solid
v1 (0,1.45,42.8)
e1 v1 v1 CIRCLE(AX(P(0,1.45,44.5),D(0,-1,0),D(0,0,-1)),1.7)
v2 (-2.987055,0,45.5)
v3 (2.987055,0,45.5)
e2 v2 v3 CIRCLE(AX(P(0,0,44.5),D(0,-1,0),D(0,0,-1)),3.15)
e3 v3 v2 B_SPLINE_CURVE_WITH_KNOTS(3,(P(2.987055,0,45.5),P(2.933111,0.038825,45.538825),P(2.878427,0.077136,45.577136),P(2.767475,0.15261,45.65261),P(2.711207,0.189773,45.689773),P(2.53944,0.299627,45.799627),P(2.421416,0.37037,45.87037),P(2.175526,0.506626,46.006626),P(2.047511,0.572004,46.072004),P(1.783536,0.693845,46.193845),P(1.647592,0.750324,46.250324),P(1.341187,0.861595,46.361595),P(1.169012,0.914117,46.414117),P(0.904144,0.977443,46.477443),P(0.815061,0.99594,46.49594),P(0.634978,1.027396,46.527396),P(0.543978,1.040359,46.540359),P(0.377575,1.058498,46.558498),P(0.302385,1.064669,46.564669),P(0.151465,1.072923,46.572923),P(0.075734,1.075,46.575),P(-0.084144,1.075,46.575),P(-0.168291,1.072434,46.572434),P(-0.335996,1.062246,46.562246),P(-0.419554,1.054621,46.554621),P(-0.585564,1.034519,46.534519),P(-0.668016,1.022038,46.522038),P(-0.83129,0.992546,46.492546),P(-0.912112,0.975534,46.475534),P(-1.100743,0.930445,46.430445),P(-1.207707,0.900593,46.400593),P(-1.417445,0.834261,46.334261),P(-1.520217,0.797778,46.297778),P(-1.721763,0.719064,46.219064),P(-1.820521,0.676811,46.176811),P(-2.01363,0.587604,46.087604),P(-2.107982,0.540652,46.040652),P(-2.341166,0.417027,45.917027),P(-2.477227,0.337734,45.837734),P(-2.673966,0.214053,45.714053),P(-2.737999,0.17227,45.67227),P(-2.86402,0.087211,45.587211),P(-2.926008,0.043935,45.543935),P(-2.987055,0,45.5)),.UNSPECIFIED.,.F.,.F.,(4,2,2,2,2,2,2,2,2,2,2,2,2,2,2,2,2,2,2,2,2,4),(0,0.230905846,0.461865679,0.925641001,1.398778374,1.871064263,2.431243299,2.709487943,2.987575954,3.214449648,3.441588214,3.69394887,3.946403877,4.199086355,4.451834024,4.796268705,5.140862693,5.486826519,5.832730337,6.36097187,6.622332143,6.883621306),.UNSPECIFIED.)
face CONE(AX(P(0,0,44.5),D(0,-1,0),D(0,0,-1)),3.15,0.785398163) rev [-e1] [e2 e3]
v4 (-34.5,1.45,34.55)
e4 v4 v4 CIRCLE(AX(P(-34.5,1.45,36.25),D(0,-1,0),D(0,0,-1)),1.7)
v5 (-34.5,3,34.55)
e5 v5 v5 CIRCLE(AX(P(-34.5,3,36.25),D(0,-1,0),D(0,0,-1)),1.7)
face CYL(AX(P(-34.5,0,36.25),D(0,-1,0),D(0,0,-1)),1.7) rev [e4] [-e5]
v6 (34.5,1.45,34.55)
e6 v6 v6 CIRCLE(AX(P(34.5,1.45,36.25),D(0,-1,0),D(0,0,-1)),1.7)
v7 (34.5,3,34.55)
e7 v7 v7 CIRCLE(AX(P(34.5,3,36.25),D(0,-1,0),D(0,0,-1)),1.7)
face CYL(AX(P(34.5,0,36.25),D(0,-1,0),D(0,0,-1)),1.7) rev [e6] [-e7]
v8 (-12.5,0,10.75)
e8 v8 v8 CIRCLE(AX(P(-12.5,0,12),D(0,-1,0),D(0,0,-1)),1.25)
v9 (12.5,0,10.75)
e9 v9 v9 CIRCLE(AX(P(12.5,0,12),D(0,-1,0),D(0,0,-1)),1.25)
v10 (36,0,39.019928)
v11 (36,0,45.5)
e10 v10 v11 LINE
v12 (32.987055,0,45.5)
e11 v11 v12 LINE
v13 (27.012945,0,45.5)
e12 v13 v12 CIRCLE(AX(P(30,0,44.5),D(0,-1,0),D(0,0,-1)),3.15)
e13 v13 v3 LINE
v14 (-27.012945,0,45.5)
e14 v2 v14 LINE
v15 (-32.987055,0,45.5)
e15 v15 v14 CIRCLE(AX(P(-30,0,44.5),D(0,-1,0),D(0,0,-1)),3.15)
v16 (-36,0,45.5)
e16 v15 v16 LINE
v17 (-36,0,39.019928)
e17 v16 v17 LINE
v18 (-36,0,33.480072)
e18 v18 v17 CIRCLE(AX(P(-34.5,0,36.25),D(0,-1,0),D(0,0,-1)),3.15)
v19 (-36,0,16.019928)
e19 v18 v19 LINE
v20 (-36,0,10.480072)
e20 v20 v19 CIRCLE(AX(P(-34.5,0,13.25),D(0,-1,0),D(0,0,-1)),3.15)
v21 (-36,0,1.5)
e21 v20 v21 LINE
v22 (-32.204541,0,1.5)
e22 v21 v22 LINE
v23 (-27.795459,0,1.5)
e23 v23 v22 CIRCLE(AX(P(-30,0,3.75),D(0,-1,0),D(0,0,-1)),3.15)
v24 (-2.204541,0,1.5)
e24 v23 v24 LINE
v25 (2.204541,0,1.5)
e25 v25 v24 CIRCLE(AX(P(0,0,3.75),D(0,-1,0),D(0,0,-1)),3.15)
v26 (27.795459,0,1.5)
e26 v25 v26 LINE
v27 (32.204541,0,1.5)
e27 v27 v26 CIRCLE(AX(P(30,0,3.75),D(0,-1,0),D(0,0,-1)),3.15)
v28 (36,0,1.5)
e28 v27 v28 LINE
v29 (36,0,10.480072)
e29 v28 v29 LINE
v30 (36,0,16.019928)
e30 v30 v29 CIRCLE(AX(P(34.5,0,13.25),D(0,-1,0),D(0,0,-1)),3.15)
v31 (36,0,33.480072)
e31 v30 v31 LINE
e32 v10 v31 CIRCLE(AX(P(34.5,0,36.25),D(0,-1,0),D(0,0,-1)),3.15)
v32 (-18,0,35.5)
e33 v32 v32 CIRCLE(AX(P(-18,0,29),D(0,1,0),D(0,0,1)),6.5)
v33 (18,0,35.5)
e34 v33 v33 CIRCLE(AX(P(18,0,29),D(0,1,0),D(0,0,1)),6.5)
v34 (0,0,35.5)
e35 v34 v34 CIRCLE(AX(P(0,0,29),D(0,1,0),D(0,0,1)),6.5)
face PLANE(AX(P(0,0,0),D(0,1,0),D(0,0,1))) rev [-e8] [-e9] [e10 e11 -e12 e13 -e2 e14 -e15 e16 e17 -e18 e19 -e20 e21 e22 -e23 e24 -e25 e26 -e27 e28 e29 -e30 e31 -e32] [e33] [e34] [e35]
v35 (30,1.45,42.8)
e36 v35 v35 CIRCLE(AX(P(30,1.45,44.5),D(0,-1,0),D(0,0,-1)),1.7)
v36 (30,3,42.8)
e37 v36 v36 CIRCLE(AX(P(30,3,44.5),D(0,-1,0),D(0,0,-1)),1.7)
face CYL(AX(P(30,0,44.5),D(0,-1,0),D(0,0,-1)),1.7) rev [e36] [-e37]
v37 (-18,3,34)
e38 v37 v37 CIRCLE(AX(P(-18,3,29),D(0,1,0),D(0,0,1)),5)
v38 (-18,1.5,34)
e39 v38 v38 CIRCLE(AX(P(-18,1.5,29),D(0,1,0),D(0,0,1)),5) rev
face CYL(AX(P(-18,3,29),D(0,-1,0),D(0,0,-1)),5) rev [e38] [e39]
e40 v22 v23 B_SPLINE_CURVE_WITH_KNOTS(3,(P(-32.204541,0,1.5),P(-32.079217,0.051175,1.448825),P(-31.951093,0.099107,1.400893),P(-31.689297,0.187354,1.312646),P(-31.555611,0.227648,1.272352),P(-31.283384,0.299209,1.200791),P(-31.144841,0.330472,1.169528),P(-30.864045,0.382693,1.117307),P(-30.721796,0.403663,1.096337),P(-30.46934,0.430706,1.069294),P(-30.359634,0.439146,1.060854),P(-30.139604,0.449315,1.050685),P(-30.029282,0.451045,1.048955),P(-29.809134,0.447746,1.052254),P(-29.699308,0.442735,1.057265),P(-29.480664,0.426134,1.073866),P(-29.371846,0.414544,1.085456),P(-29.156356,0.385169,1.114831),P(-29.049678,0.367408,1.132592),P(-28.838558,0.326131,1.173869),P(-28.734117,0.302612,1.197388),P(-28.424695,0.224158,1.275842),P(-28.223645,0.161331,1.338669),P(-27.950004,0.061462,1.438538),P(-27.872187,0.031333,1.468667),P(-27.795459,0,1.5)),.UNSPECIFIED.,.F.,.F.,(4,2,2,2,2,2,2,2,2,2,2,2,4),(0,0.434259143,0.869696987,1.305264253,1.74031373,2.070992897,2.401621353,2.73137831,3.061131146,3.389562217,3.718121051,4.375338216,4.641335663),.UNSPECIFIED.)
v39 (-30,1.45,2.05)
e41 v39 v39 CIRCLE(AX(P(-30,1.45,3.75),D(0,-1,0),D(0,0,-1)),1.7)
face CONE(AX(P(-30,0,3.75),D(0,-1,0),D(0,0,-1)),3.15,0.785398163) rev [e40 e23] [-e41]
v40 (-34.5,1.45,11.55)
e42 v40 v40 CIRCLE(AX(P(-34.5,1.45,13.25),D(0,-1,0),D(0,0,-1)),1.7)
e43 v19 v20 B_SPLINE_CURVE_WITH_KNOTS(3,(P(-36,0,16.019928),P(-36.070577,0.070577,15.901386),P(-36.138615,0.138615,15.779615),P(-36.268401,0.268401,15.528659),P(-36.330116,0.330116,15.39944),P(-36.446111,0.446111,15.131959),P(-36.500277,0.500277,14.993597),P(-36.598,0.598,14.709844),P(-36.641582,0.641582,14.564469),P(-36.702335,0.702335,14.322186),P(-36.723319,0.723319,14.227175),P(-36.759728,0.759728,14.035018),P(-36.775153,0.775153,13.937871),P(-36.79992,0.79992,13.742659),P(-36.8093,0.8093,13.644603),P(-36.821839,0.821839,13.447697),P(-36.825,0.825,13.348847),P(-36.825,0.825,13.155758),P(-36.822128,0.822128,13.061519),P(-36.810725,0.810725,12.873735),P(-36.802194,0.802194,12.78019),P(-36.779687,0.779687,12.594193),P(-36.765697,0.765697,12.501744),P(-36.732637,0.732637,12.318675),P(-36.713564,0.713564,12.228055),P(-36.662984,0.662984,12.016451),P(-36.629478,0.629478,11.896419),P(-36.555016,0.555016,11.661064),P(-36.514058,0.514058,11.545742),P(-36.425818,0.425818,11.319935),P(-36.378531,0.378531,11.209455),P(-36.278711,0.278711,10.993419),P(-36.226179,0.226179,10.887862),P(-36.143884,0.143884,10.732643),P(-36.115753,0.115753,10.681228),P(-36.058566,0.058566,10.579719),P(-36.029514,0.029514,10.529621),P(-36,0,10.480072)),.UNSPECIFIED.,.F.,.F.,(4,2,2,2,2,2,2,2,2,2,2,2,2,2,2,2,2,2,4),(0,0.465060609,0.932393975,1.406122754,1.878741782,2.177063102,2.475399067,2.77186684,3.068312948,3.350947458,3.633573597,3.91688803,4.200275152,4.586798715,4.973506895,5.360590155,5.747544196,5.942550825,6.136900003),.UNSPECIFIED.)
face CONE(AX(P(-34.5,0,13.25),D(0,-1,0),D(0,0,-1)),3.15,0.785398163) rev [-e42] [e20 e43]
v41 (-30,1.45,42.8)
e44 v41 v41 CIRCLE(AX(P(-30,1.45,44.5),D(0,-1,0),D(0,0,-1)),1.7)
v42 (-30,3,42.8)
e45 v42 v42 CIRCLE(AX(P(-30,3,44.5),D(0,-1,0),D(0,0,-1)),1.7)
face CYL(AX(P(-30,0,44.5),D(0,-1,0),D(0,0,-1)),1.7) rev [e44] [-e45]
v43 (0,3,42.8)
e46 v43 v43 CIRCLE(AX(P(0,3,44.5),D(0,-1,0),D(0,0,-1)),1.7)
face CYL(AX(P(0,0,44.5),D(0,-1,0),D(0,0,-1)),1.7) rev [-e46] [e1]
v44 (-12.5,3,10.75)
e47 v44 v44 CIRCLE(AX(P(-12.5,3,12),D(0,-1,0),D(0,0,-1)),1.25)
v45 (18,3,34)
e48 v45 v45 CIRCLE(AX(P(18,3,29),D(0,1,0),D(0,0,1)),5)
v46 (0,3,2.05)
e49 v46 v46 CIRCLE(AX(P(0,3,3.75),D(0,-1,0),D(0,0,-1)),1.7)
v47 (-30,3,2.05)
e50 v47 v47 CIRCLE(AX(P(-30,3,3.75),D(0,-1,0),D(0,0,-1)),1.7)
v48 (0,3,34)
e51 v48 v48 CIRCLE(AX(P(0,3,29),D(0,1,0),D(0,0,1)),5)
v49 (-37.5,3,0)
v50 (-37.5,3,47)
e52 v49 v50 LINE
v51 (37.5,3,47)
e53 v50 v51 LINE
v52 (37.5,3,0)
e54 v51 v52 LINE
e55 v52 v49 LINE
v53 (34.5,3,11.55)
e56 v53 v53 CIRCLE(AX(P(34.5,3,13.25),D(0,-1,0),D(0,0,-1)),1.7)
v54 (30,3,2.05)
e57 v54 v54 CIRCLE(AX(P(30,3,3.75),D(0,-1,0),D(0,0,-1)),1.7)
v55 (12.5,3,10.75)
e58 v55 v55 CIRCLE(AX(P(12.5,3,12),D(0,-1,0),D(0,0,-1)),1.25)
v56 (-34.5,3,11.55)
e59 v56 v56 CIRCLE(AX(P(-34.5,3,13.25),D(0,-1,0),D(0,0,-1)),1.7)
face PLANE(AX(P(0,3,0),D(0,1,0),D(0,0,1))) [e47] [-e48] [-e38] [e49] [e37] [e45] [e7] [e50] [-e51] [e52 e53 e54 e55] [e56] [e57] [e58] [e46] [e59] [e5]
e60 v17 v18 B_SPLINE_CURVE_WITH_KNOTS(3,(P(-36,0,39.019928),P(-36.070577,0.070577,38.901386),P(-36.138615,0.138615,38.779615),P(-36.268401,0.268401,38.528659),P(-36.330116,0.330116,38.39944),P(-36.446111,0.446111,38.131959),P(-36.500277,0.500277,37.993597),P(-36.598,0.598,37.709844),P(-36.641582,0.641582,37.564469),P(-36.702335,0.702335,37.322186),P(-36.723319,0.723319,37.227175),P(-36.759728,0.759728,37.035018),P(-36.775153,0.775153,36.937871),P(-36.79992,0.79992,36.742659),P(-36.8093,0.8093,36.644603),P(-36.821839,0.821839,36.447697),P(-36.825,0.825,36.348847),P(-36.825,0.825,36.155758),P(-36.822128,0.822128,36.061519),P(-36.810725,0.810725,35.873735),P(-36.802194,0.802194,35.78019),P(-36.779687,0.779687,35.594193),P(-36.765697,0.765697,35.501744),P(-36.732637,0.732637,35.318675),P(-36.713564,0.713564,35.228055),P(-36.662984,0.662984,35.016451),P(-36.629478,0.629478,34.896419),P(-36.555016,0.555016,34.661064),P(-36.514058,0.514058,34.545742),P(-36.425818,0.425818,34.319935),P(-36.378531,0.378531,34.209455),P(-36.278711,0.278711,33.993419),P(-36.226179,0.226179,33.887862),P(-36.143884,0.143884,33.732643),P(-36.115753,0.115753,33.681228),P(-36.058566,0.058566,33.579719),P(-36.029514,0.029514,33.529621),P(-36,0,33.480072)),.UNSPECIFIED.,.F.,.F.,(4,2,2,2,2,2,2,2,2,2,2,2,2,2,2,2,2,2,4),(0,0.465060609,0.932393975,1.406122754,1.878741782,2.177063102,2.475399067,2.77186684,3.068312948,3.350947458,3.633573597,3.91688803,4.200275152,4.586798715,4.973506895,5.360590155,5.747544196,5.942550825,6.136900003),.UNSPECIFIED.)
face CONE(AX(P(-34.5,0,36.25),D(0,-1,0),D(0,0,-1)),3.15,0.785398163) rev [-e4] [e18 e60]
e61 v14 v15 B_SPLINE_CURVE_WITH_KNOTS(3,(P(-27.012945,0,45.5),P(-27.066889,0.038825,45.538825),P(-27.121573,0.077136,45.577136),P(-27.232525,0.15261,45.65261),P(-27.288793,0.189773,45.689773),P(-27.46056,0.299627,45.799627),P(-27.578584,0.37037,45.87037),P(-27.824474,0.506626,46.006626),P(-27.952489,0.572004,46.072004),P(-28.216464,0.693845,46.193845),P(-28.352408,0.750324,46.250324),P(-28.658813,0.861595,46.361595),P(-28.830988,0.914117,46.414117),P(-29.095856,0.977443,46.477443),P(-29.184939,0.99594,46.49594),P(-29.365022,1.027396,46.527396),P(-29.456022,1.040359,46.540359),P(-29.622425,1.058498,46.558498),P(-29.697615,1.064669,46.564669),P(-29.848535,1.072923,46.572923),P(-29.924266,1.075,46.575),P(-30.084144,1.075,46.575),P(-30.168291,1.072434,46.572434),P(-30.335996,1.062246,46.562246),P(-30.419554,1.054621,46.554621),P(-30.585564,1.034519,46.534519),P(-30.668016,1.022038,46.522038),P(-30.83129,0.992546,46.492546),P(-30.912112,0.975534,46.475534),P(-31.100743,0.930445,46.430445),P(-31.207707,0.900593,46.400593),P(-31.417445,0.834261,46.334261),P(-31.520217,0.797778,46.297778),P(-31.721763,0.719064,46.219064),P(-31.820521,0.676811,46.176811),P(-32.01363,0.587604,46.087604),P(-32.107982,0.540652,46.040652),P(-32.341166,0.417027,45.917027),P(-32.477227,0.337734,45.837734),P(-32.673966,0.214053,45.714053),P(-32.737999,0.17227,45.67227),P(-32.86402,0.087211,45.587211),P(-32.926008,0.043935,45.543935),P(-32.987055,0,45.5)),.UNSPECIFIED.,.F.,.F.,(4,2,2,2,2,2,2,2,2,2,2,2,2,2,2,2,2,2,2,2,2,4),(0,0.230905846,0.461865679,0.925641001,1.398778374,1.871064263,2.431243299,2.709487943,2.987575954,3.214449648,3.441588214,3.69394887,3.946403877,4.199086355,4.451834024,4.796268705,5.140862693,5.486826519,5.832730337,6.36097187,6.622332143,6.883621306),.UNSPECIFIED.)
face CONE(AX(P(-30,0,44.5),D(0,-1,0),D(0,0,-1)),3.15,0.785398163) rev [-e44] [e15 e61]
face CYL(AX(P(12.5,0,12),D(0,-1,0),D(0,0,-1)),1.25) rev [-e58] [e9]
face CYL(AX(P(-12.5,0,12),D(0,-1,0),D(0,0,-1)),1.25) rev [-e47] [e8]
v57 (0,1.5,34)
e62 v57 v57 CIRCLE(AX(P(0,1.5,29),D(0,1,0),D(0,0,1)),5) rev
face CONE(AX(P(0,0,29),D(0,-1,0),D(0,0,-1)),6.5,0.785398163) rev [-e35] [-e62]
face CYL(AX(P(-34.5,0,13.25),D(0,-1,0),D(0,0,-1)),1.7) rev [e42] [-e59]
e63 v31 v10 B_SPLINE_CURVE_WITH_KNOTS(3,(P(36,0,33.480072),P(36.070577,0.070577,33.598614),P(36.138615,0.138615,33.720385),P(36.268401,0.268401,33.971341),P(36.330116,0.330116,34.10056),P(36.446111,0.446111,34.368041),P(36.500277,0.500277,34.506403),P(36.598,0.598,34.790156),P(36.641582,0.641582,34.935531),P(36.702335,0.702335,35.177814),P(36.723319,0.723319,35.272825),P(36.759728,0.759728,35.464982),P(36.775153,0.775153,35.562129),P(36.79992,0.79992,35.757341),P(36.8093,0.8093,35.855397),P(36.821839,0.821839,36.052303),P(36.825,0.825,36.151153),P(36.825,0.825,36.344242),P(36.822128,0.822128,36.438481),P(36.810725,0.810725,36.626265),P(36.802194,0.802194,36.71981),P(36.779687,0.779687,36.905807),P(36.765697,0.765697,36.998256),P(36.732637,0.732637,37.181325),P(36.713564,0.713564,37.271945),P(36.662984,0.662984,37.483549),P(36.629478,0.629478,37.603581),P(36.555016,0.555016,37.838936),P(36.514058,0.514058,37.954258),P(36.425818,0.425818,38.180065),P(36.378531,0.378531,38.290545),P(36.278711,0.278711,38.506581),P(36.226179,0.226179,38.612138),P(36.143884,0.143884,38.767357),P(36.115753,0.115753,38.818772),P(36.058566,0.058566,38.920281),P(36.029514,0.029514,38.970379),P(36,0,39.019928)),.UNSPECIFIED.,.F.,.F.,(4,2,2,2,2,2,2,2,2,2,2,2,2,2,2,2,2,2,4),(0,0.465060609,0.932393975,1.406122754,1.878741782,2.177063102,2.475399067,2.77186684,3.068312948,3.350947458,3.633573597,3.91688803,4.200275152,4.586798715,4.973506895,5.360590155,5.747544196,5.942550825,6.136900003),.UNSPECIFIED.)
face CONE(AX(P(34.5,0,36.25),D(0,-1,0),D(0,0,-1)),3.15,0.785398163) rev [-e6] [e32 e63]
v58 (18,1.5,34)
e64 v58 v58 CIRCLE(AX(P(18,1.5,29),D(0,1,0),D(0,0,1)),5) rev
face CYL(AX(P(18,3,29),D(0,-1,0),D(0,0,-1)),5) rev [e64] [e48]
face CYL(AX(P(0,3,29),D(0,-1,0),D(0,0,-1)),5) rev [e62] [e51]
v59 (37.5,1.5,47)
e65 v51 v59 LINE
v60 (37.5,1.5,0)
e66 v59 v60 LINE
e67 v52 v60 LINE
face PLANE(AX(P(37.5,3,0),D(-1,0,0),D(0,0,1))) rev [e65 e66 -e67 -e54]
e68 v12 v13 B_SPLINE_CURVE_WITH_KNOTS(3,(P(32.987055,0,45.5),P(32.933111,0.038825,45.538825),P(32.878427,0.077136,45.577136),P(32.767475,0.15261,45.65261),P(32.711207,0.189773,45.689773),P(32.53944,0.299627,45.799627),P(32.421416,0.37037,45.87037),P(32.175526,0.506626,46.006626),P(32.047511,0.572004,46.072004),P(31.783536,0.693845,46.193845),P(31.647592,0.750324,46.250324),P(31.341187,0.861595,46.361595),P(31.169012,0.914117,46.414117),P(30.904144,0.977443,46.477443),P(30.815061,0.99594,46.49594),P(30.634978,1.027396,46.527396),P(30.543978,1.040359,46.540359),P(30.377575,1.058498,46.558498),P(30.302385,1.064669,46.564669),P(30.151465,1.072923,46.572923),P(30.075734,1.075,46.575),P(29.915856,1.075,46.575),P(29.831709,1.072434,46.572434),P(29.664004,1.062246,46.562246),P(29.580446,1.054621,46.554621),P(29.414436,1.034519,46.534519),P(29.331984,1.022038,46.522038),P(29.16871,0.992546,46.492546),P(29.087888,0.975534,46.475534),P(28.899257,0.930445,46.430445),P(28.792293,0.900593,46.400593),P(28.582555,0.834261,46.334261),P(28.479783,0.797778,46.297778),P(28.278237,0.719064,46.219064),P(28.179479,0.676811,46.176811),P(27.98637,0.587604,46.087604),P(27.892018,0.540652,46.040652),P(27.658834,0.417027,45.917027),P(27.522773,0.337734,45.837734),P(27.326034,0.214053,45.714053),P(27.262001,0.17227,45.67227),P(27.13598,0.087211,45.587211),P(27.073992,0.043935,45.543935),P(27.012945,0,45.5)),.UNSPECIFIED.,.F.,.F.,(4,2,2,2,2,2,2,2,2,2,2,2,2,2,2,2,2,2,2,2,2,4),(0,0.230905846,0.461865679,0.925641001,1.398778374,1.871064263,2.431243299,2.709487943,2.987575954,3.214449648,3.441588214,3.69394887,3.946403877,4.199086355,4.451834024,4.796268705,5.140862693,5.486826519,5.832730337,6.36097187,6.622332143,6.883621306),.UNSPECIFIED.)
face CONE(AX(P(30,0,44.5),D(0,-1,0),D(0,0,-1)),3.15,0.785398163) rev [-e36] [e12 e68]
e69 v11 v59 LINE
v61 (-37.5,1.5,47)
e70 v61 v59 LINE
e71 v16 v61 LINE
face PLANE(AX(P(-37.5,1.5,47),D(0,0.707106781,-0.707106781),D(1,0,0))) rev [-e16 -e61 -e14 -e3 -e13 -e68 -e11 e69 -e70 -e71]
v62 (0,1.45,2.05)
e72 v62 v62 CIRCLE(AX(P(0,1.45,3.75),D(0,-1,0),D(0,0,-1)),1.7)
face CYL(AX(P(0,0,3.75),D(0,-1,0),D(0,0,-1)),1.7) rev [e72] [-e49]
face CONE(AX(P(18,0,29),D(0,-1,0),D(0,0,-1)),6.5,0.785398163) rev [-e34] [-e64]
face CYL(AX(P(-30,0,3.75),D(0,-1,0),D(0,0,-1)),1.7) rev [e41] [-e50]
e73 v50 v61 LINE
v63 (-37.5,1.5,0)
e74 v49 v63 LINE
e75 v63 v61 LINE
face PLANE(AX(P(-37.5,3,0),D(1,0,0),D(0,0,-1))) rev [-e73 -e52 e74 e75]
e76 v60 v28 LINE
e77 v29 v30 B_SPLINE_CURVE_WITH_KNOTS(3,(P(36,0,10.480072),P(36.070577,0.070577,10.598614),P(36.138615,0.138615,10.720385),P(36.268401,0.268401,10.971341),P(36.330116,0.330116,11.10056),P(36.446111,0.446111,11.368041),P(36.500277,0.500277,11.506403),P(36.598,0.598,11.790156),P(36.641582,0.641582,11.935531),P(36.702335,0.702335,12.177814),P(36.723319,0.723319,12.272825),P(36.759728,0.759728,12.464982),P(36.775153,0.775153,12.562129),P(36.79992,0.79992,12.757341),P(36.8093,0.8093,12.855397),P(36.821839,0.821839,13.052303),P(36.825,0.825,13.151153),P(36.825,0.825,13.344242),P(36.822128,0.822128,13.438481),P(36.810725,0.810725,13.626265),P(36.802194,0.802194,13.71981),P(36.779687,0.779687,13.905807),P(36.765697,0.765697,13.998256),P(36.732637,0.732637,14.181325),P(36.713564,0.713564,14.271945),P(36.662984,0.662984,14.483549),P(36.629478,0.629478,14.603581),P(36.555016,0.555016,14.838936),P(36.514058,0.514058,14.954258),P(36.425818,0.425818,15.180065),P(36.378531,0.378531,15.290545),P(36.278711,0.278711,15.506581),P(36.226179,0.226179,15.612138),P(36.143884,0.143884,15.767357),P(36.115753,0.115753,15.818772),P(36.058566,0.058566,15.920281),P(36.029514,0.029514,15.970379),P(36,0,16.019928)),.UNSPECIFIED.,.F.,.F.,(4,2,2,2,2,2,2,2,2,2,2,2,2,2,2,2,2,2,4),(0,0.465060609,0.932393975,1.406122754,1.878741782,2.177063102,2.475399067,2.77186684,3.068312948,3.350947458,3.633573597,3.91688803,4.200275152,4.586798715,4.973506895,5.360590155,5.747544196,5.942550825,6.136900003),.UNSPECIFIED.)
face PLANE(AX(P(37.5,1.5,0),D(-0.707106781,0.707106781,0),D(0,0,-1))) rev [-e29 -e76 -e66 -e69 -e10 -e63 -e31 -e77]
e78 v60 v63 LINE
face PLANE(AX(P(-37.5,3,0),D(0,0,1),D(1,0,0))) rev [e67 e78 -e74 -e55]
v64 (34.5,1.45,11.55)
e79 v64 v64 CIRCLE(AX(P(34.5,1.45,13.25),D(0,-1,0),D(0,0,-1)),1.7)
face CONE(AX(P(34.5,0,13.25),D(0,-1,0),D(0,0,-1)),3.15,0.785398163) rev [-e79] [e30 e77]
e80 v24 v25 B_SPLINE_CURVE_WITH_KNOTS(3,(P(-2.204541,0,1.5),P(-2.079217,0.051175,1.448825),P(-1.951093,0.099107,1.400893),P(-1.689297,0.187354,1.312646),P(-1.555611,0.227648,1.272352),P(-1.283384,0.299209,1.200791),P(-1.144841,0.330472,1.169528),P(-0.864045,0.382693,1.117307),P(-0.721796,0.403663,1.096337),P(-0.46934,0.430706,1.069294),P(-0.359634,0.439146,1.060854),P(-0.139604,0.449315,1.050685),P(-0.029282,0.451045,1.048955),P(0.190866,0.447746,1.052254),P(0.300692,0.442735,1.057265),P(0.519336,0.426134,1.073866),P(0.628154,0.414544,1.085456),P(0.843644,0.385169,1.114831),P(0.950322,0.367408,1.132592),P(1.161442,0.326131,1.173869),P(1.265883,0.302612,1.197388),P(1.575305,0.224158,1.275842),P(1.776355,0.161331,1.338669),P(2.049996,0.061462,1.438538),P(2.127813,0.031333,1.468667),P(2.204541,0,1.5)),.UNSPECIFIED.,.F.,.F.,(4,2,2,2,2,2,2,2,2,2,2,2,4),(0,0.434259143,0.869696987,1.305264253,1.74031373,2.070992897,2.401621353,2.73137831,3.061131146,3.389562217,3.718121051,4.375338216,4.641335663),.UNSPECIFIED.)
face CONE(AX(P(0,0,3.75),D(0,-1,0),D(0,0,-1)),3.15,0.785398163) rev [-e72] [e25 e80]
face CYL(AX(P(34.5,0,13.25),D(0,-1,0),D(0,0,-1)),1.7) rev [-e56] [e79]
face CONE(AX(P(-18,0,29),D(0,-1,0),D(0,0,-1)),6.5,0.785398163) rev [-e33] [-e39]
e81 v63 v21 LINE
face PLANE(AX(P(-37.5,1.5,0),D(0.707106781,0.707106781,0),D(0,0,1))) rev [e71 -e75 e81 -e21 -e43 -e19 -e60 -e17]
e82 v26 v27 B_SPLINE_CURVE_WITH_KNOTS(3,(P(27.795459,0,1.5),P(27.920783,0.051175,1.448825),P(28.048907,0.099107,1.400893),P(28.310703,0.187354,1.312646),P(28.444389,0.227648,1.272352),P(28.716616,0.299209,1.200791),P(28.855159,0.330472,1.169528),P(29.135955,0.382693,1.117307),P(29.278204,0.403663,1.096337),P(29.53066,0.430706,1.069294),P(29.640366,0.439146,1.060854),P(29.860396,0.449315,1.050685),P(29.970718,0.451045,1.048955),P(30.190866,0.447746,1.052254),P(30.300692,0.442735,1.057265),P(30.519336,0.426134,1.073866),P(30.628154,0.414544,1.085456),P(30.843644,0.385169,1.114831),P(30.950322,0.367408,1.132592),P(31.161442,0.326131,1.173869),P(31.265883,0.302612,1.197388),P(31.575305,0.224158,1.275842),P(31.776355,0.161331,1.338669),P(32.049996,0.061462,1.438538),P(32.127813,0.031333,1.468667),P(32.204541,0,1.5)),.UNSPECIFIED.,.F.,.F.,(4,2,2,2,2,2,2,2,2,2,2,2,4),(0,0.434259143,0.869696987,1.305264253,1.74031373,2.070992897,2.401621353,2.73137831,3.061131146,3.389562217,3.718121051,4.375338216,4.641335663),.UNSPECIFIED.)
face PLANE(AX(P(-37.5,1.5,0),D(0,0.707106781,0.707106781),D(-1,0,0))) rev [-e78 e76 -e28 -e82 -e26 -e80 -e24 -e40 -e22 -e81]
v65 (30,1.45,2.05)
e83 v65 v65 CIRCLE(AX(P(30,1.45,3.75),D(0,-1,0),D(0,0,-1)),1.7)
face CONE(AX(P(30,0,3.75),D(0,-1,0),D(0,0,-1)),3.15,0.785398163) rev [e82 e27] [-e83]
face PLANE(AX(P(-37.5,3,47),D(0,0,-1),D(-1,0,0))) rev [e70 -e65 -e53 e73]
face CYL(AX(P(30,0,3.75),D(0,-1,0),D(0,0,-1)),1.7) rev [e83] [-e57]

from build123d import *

# Parameters (mm, degrees)
SKETCH_1_W                 = 75
SKETCH_1_H                 = 47
SKETCH_1_R                 = 5
EXTRUDE_731_DEPTH          = 3
HOLE_WIZARD_M3_AT_2_COUNT  = 2
HOLE_WIZARD_M3_AT_2_PITCH  = 30
HOLE_WIZARD_M3_AT_3_COUNT  = 2
HOLE_WIZARD_M3_AT_3_PITCH  = 30
HOLE_WIZARD_M3_AT_4_COUNT  = 2
HOLE_WIZARD_M3_AT_4_PITCH  = 40.75
HOLE_WIZARD_M3_AT_5_COUNT  = 2
HOLE_WIZARD_M3_AT_5_PITCH  = 50.602000949
HOLE_WIZARD_M3_AT_6_COUNT  = 2
HOLE_WIZARD_M3_AT_6_PITCH  = 50.602000949
HOLE_WIZARD_M3_AT_7_COUNT  = 2
HOLE_WIZARD_M3_AT_7_PITCH  = 35.472700771
HOLE_WIZARD_M3_AT_8_COUNT  = 2
HOLE_WIZARD_M3_AT_8_PITCH  = 35.472700771
HOLE_WIZARD_M3_AT_9_COUNT  = 2
HOLE_WIZARD_M3_AT_9_PITCH  = 46.549033287
HOLE_WIZARD_M3_AT_10_COUNT = 2
HOLE_WIZARD_M3_AT_10_PITCH = 46.549033287
HOLE_WIZARD_M3_2_D         = 2.5
CHAMFER_1_SIZE             = 1.5


with BuildPart() as part:
    # Эскиз1 → Extrude 731 (new body)
    with BuildSketch(Plane(origin=(0, 0, 0), x_dir=(1, 0, 0), z_dir=(0, 1, 0))):
        with Locations((0, -23.5)):
            Rectangle(SKETCH_1_W, SKETCH_1_H)
        with Locations(Location((18, -29, 0), (0, 0, 270))):
            Circle(SKETCH_1_R, mode=Mode.SUBTRACT)
        with Locations(Location((-18, -29, 0), (0, 0, 270))):
            Circle(SKETCH_1_R, mode=Mode.SUBTRACT)
        with Locations(Location((0, -29, 0), (0, 0, 270))):
            Circle(SKETCH_1_R, mode=Mode.SUBTRACT)
    extrude(amount=EXTRUDE_731_DEPTH)

    # Эскиз3 → Hole Wizard M3 (revolve, cut)
    with BuildSketch(Plane(origin=(0, 0, 44.5), x_dir=(0, 0, -1), z_dir=(1, 0, 0))):
        Polygon((0, 0), (0, 3), (1.7, 3), (1.7, 1.45), (3.15, 0), align=None)
    hole_wizard_m3 = revolve(axis=Axis((0, -6.35, 44.5), (0, 1, 0)), mode=Mode.SUBTRACT)

    # Hole Wizard M3 at 2: Hole Wizard M3 ×2
    with Locations(*[(i * HOLE_WIZARD_M3_AT_2_PITCH, 0, 0) for i in range(1, HOLE_WIZARD_M3_AT_2_COUNT)]):
        add(hole_wizard_m3, mode=Mode.SUBTRACT)

    # Hole Wizard M3 at 3: Hole Wizard M3 ×2
    with Locations(*[(-i * HOLE_WIZARD_M3_AT_3_PITCH, 0, 0) for i in range(1, HOLE_WIZARD_M3_AT_3_COUNT)]):
        add(hole_wizard_m3, mode=Mode.SUBTRACT)

    # Hole Wizard M3 at 4: Hole Wizard M3 ×2
    with Locations(*[(0, 0, -i * HOLE_WIZARD_M3_AT_4_PITCH) for i in range(1, HOLE_WIZARD_M3_AT_4_COUNT)]):
        add(hole_wizard_m3, mode=Mode.SUBTRACT)

    # Hole Wizard M3 at 5: Hole Wizard M3 ×2
    with Locations(*[Vector(-0.5928619311020034, 0, -0.8053041230802209) * (i * HOLE_WIZARD_M3_AT_5_PITCH) for i in range(1, HOLE_WIZARD_M3_AT_5_COUNT)]):
        add(hole_wizard_m3, mode=Mode.SUBTRACT)

    # Hole Wizard M3 at 6: Hole Wizard M3 ×2
    with Locations(*[Vector(0.5928619311020034, 0, -0.8053041230802209) * (i * HOLE_WIZARD_M3_AT_6_PITCH) for i in range(1, HOLE_WIZARD_M3_AT_6_COUNT)]):
        add(hole_wizard_m3, mode=Mode.SUBTRACT)

    # Hole Wizard M3 at 7: Hole Wizard M3 ×2
    with Locations(*[Vector(-0.972578891654415, 0, -0.23257321322170757) * (i * HOLE_WIZARD_M3_AT_7_PITCH) for i in range(1, HOLE_WIZARD_M3_AT_7_COUNT)]):
        add(hole_wizard_m3, mode=Mode.SUBTRACT)

    # Hole Wizard M3 at 8: Hole Wizard M3 ×2
    with Locations(*[Vector(0.972578891654415, 0, -0.23257321322170757) * (i * HOLE_WIZARD_M3_AT_8_PITCH) for i in range(1, HOLE_WIZARD_M3_AT_8_COUNT)]):
        add(hole_wizard_m3, mode=Mode.SUBTRACT)

    # Hole Wizard M3 at 9: Hole Wizard M3 ×2
    with Locations(*[Vector(0.7411539523694183, 0, -0.6713351017838932) * (i * HOLE_WIZARD_M3_AT_9_PITCH) for i in range(1, HOLE_WIZARD_M3_AT_9_COUNT)]):
        add(hole_wizard_m3, mode=Mode.SUBTRACT)

    # Hole Wizard M3 at 10: Hole Wizard M3 ×2
    with Locations(*[Vector(-0.7411539523694182, 0, -0.6713351017838932) * (i * HOLE_WIZARD_M3_AT_10_PITCH) for i in range(1, HOLE_WIZARD_M3_AT_10_COUNT)]):
        add(hole_wizard_m3, mode=Mode.SUBTRACT)

    # Hole Wizard M3 2 (through all)
    with Locations(Plane(origin=(0, 0, 0), x_dir=(-1, 0, 0), z_dir=(0, -1, 0))):
        with Locations((12.5, -12), (-12.5, -12)):
            Hole(HOLE_WIZARD_M3_2_D / 2)

    # Фаска1
    # the kernel refuses this chamfer: 1.5 mm, written as the material it takes off along each edge
    with BuildSketch(Plane(origin=(31.941147692, 0, 47), x_dir=(0, -0.02749587661058636, -0.9996219169112968), z_dir=(-1, 0, 0)), Plane(origin=(1.941147692, 0, 47), x_dir=(0, -0.02749587661058636, -0.9996219169112968), z_dir=(-1, 0, 0))) as chamfer_1_piece_1:
        Polygon((CHAMFER_1_SIZE * 0.999621916911, -CHAMFER_1_SIZE * 0.0274958766106), (-CHAMFER_1_SIZE * 0.0274958766106, -CHAMFER_1_SIZE * 0.999621916911), (0, 0), align=None)
    extrude(amount=33.882295385, mode=Mode.SUBTRACT)
    with BuildSketch(Plane(origin=(0, 0, 29), x_dir=(0, 0, 1), z_dir=(-1, 0, 0))) as chamfer_1_piece_2:
        Polygon((5 + CHAMFER_1_SIZE, 0), (5, CHAMFER_1_SIZE), (5, 0), align=None)
    revolve(axis=Axis((0, 0, 29), (0, 1, 0)), mode=Mode.SUBTRACT)
    with BuildSketch(Plane(origin=(18, 0, 29), x_dir=(0, 0, 1), z_dir=(-1, 0, 0))) as chamfer_1_piece_3:
        Polygon((5 + CHAMFER_1_SIZE, 0), (5, CHAMFER_1_SIZE), (5, 0), align=None)
    revolve(axis=Axis((18, 0, 29), (0, 1, 0)), mode=Mode.SUBTRACT)
    with BuildSketch(Plane(origin=(-18, 0, 29), x_dir=(0, 0, 1), z_dir=(-1, 0, 0))) as chamfer_1_piece_4:
        Polygon((5 + CHAMFER_1_SIZE, 0), (5, CHAMFER_1_SIZE), (5, 0), align=None)
    revolve(axis=Axis((-18, 0, 29), (0, 1, 0)), mode=Mode.SUBTRACT)
    with BuildSketch(Plane(origin=(-37.5, 0, 39.147055846), x_dir=(-0.027495876610586778, 0.9996219169112968, 0), z_dir=(0, 0, -1)), Plane(origin=(37.5, 0, 10.352944154), x_dir=(0.027495876610586778, 0.9996219169112968, 0), z_dir=(0, 0, 1))) as chamfer_1_piece_5:
        Polygon((CHAMFER_1_SIZE * 0.999621916911, CHAMFER_1_SIZE * 0.0274958766106), (-CHAMFER_1_SIZE * 0.0274958766106, CHAMFER_1_SIZE * 0.999621916911), (0, 0), align=None)
    extrude(amount=28.794111693, mode=Mode.SUBTRACT)
    with BuildSketch(Plane(origin=(37.5, 0, -3.857524482), x_dir=(0.027495876610586778, 0.9996219169112968, 0), z_dir=(0, 0, 1)), Plane(origin=(-37.5, 0, 16.147055846), x_dir=(-0.027495876610586778, 0.9996219169112968, 0), z_dir=(0, 0, -1))) as chamfer_1_piece_6:
        Polygon((CHAMFER_1_SIZE * 0.999621916911, CHAMFER_1_SIZE * 0.0274958766106), (-CHAMFER_1_SIZE * 0.0274958766106, CHAMFER_1_SIZE * 0.999621916911), (0, 0), align=None)
    extrude(amount=20.004580328, mode=Mode.SUBTRACT)
    with BuildSketch(Plane(origin=(-28.058852308, 0, 47), x_dir=(0, -0.02749587661058636, -0.9996219169112968), z_dir=(-1, 0, 0)), Plane(origin=(41.357524482, 0, 47), x_dir=(0, -0.02749587661058636, -0.9996219169112968), z_dir=(-1, 0, 0))) as chamfer_1_piece_7:
        Polygon((CHAMFER_1_SIZE * 0.999621916911, -CHAMFER_1_SIZE * 0.0274958766106), (-CHAMFER_1_SIZE * 0.0274958766106, -CHAMFER_1_SIZE * 0.999621916911), (0, 0), align=None)
    extrude(amount=13.298672174, mode=Mode.SUBTRACT)
    with BuildSketch(Plane(origin=(-41.357524482, 0, 0), x_dir=(0, 0.9996219169112968, -0.027495876610586372), z_dir=(1, 0, 0))) as chamfer_1_piece_8:
        Polygon((CHAMFER_1_SIZE * 0.999621916911, CHAMFER_1_SIZE * 0.0274958766106), (-CHAMFER_1_SIZE * 0.0274958766106, CHAMFER_1_SIZE * 0.999621916911), (0, 0), align=None)
    extrude(amount=82.715048964, mode=Mode.SUBTRACT)
    with BuildSketch(Plane(origin=(37.5, 0, 33.352944154), x_dir=(0.027495876610586778, 0.9996219169112968, 0), z_dir=(0, 0, 1)), Plane(origin=(-37.5, 0, 50.857524482), x_dir=(-0.027495876610586778, 0.9996219169112968, 0), z_dir=(0, 0, -1))) as chamfer_1_piece_9:
        Polygon((CHAMFER_1_SIZE * 0.999621916911, CHAMFER_1_SIZE * 0.0274958766106), (-CHAMFER_1_SIZE * 0.0274958766106, CHAMFER_1_SIZE * 0.999621916911), (0, 0), align=None)
    extrude(amount=17.504580328, mode=Mode.SUBTRACT)


solid = part.part
